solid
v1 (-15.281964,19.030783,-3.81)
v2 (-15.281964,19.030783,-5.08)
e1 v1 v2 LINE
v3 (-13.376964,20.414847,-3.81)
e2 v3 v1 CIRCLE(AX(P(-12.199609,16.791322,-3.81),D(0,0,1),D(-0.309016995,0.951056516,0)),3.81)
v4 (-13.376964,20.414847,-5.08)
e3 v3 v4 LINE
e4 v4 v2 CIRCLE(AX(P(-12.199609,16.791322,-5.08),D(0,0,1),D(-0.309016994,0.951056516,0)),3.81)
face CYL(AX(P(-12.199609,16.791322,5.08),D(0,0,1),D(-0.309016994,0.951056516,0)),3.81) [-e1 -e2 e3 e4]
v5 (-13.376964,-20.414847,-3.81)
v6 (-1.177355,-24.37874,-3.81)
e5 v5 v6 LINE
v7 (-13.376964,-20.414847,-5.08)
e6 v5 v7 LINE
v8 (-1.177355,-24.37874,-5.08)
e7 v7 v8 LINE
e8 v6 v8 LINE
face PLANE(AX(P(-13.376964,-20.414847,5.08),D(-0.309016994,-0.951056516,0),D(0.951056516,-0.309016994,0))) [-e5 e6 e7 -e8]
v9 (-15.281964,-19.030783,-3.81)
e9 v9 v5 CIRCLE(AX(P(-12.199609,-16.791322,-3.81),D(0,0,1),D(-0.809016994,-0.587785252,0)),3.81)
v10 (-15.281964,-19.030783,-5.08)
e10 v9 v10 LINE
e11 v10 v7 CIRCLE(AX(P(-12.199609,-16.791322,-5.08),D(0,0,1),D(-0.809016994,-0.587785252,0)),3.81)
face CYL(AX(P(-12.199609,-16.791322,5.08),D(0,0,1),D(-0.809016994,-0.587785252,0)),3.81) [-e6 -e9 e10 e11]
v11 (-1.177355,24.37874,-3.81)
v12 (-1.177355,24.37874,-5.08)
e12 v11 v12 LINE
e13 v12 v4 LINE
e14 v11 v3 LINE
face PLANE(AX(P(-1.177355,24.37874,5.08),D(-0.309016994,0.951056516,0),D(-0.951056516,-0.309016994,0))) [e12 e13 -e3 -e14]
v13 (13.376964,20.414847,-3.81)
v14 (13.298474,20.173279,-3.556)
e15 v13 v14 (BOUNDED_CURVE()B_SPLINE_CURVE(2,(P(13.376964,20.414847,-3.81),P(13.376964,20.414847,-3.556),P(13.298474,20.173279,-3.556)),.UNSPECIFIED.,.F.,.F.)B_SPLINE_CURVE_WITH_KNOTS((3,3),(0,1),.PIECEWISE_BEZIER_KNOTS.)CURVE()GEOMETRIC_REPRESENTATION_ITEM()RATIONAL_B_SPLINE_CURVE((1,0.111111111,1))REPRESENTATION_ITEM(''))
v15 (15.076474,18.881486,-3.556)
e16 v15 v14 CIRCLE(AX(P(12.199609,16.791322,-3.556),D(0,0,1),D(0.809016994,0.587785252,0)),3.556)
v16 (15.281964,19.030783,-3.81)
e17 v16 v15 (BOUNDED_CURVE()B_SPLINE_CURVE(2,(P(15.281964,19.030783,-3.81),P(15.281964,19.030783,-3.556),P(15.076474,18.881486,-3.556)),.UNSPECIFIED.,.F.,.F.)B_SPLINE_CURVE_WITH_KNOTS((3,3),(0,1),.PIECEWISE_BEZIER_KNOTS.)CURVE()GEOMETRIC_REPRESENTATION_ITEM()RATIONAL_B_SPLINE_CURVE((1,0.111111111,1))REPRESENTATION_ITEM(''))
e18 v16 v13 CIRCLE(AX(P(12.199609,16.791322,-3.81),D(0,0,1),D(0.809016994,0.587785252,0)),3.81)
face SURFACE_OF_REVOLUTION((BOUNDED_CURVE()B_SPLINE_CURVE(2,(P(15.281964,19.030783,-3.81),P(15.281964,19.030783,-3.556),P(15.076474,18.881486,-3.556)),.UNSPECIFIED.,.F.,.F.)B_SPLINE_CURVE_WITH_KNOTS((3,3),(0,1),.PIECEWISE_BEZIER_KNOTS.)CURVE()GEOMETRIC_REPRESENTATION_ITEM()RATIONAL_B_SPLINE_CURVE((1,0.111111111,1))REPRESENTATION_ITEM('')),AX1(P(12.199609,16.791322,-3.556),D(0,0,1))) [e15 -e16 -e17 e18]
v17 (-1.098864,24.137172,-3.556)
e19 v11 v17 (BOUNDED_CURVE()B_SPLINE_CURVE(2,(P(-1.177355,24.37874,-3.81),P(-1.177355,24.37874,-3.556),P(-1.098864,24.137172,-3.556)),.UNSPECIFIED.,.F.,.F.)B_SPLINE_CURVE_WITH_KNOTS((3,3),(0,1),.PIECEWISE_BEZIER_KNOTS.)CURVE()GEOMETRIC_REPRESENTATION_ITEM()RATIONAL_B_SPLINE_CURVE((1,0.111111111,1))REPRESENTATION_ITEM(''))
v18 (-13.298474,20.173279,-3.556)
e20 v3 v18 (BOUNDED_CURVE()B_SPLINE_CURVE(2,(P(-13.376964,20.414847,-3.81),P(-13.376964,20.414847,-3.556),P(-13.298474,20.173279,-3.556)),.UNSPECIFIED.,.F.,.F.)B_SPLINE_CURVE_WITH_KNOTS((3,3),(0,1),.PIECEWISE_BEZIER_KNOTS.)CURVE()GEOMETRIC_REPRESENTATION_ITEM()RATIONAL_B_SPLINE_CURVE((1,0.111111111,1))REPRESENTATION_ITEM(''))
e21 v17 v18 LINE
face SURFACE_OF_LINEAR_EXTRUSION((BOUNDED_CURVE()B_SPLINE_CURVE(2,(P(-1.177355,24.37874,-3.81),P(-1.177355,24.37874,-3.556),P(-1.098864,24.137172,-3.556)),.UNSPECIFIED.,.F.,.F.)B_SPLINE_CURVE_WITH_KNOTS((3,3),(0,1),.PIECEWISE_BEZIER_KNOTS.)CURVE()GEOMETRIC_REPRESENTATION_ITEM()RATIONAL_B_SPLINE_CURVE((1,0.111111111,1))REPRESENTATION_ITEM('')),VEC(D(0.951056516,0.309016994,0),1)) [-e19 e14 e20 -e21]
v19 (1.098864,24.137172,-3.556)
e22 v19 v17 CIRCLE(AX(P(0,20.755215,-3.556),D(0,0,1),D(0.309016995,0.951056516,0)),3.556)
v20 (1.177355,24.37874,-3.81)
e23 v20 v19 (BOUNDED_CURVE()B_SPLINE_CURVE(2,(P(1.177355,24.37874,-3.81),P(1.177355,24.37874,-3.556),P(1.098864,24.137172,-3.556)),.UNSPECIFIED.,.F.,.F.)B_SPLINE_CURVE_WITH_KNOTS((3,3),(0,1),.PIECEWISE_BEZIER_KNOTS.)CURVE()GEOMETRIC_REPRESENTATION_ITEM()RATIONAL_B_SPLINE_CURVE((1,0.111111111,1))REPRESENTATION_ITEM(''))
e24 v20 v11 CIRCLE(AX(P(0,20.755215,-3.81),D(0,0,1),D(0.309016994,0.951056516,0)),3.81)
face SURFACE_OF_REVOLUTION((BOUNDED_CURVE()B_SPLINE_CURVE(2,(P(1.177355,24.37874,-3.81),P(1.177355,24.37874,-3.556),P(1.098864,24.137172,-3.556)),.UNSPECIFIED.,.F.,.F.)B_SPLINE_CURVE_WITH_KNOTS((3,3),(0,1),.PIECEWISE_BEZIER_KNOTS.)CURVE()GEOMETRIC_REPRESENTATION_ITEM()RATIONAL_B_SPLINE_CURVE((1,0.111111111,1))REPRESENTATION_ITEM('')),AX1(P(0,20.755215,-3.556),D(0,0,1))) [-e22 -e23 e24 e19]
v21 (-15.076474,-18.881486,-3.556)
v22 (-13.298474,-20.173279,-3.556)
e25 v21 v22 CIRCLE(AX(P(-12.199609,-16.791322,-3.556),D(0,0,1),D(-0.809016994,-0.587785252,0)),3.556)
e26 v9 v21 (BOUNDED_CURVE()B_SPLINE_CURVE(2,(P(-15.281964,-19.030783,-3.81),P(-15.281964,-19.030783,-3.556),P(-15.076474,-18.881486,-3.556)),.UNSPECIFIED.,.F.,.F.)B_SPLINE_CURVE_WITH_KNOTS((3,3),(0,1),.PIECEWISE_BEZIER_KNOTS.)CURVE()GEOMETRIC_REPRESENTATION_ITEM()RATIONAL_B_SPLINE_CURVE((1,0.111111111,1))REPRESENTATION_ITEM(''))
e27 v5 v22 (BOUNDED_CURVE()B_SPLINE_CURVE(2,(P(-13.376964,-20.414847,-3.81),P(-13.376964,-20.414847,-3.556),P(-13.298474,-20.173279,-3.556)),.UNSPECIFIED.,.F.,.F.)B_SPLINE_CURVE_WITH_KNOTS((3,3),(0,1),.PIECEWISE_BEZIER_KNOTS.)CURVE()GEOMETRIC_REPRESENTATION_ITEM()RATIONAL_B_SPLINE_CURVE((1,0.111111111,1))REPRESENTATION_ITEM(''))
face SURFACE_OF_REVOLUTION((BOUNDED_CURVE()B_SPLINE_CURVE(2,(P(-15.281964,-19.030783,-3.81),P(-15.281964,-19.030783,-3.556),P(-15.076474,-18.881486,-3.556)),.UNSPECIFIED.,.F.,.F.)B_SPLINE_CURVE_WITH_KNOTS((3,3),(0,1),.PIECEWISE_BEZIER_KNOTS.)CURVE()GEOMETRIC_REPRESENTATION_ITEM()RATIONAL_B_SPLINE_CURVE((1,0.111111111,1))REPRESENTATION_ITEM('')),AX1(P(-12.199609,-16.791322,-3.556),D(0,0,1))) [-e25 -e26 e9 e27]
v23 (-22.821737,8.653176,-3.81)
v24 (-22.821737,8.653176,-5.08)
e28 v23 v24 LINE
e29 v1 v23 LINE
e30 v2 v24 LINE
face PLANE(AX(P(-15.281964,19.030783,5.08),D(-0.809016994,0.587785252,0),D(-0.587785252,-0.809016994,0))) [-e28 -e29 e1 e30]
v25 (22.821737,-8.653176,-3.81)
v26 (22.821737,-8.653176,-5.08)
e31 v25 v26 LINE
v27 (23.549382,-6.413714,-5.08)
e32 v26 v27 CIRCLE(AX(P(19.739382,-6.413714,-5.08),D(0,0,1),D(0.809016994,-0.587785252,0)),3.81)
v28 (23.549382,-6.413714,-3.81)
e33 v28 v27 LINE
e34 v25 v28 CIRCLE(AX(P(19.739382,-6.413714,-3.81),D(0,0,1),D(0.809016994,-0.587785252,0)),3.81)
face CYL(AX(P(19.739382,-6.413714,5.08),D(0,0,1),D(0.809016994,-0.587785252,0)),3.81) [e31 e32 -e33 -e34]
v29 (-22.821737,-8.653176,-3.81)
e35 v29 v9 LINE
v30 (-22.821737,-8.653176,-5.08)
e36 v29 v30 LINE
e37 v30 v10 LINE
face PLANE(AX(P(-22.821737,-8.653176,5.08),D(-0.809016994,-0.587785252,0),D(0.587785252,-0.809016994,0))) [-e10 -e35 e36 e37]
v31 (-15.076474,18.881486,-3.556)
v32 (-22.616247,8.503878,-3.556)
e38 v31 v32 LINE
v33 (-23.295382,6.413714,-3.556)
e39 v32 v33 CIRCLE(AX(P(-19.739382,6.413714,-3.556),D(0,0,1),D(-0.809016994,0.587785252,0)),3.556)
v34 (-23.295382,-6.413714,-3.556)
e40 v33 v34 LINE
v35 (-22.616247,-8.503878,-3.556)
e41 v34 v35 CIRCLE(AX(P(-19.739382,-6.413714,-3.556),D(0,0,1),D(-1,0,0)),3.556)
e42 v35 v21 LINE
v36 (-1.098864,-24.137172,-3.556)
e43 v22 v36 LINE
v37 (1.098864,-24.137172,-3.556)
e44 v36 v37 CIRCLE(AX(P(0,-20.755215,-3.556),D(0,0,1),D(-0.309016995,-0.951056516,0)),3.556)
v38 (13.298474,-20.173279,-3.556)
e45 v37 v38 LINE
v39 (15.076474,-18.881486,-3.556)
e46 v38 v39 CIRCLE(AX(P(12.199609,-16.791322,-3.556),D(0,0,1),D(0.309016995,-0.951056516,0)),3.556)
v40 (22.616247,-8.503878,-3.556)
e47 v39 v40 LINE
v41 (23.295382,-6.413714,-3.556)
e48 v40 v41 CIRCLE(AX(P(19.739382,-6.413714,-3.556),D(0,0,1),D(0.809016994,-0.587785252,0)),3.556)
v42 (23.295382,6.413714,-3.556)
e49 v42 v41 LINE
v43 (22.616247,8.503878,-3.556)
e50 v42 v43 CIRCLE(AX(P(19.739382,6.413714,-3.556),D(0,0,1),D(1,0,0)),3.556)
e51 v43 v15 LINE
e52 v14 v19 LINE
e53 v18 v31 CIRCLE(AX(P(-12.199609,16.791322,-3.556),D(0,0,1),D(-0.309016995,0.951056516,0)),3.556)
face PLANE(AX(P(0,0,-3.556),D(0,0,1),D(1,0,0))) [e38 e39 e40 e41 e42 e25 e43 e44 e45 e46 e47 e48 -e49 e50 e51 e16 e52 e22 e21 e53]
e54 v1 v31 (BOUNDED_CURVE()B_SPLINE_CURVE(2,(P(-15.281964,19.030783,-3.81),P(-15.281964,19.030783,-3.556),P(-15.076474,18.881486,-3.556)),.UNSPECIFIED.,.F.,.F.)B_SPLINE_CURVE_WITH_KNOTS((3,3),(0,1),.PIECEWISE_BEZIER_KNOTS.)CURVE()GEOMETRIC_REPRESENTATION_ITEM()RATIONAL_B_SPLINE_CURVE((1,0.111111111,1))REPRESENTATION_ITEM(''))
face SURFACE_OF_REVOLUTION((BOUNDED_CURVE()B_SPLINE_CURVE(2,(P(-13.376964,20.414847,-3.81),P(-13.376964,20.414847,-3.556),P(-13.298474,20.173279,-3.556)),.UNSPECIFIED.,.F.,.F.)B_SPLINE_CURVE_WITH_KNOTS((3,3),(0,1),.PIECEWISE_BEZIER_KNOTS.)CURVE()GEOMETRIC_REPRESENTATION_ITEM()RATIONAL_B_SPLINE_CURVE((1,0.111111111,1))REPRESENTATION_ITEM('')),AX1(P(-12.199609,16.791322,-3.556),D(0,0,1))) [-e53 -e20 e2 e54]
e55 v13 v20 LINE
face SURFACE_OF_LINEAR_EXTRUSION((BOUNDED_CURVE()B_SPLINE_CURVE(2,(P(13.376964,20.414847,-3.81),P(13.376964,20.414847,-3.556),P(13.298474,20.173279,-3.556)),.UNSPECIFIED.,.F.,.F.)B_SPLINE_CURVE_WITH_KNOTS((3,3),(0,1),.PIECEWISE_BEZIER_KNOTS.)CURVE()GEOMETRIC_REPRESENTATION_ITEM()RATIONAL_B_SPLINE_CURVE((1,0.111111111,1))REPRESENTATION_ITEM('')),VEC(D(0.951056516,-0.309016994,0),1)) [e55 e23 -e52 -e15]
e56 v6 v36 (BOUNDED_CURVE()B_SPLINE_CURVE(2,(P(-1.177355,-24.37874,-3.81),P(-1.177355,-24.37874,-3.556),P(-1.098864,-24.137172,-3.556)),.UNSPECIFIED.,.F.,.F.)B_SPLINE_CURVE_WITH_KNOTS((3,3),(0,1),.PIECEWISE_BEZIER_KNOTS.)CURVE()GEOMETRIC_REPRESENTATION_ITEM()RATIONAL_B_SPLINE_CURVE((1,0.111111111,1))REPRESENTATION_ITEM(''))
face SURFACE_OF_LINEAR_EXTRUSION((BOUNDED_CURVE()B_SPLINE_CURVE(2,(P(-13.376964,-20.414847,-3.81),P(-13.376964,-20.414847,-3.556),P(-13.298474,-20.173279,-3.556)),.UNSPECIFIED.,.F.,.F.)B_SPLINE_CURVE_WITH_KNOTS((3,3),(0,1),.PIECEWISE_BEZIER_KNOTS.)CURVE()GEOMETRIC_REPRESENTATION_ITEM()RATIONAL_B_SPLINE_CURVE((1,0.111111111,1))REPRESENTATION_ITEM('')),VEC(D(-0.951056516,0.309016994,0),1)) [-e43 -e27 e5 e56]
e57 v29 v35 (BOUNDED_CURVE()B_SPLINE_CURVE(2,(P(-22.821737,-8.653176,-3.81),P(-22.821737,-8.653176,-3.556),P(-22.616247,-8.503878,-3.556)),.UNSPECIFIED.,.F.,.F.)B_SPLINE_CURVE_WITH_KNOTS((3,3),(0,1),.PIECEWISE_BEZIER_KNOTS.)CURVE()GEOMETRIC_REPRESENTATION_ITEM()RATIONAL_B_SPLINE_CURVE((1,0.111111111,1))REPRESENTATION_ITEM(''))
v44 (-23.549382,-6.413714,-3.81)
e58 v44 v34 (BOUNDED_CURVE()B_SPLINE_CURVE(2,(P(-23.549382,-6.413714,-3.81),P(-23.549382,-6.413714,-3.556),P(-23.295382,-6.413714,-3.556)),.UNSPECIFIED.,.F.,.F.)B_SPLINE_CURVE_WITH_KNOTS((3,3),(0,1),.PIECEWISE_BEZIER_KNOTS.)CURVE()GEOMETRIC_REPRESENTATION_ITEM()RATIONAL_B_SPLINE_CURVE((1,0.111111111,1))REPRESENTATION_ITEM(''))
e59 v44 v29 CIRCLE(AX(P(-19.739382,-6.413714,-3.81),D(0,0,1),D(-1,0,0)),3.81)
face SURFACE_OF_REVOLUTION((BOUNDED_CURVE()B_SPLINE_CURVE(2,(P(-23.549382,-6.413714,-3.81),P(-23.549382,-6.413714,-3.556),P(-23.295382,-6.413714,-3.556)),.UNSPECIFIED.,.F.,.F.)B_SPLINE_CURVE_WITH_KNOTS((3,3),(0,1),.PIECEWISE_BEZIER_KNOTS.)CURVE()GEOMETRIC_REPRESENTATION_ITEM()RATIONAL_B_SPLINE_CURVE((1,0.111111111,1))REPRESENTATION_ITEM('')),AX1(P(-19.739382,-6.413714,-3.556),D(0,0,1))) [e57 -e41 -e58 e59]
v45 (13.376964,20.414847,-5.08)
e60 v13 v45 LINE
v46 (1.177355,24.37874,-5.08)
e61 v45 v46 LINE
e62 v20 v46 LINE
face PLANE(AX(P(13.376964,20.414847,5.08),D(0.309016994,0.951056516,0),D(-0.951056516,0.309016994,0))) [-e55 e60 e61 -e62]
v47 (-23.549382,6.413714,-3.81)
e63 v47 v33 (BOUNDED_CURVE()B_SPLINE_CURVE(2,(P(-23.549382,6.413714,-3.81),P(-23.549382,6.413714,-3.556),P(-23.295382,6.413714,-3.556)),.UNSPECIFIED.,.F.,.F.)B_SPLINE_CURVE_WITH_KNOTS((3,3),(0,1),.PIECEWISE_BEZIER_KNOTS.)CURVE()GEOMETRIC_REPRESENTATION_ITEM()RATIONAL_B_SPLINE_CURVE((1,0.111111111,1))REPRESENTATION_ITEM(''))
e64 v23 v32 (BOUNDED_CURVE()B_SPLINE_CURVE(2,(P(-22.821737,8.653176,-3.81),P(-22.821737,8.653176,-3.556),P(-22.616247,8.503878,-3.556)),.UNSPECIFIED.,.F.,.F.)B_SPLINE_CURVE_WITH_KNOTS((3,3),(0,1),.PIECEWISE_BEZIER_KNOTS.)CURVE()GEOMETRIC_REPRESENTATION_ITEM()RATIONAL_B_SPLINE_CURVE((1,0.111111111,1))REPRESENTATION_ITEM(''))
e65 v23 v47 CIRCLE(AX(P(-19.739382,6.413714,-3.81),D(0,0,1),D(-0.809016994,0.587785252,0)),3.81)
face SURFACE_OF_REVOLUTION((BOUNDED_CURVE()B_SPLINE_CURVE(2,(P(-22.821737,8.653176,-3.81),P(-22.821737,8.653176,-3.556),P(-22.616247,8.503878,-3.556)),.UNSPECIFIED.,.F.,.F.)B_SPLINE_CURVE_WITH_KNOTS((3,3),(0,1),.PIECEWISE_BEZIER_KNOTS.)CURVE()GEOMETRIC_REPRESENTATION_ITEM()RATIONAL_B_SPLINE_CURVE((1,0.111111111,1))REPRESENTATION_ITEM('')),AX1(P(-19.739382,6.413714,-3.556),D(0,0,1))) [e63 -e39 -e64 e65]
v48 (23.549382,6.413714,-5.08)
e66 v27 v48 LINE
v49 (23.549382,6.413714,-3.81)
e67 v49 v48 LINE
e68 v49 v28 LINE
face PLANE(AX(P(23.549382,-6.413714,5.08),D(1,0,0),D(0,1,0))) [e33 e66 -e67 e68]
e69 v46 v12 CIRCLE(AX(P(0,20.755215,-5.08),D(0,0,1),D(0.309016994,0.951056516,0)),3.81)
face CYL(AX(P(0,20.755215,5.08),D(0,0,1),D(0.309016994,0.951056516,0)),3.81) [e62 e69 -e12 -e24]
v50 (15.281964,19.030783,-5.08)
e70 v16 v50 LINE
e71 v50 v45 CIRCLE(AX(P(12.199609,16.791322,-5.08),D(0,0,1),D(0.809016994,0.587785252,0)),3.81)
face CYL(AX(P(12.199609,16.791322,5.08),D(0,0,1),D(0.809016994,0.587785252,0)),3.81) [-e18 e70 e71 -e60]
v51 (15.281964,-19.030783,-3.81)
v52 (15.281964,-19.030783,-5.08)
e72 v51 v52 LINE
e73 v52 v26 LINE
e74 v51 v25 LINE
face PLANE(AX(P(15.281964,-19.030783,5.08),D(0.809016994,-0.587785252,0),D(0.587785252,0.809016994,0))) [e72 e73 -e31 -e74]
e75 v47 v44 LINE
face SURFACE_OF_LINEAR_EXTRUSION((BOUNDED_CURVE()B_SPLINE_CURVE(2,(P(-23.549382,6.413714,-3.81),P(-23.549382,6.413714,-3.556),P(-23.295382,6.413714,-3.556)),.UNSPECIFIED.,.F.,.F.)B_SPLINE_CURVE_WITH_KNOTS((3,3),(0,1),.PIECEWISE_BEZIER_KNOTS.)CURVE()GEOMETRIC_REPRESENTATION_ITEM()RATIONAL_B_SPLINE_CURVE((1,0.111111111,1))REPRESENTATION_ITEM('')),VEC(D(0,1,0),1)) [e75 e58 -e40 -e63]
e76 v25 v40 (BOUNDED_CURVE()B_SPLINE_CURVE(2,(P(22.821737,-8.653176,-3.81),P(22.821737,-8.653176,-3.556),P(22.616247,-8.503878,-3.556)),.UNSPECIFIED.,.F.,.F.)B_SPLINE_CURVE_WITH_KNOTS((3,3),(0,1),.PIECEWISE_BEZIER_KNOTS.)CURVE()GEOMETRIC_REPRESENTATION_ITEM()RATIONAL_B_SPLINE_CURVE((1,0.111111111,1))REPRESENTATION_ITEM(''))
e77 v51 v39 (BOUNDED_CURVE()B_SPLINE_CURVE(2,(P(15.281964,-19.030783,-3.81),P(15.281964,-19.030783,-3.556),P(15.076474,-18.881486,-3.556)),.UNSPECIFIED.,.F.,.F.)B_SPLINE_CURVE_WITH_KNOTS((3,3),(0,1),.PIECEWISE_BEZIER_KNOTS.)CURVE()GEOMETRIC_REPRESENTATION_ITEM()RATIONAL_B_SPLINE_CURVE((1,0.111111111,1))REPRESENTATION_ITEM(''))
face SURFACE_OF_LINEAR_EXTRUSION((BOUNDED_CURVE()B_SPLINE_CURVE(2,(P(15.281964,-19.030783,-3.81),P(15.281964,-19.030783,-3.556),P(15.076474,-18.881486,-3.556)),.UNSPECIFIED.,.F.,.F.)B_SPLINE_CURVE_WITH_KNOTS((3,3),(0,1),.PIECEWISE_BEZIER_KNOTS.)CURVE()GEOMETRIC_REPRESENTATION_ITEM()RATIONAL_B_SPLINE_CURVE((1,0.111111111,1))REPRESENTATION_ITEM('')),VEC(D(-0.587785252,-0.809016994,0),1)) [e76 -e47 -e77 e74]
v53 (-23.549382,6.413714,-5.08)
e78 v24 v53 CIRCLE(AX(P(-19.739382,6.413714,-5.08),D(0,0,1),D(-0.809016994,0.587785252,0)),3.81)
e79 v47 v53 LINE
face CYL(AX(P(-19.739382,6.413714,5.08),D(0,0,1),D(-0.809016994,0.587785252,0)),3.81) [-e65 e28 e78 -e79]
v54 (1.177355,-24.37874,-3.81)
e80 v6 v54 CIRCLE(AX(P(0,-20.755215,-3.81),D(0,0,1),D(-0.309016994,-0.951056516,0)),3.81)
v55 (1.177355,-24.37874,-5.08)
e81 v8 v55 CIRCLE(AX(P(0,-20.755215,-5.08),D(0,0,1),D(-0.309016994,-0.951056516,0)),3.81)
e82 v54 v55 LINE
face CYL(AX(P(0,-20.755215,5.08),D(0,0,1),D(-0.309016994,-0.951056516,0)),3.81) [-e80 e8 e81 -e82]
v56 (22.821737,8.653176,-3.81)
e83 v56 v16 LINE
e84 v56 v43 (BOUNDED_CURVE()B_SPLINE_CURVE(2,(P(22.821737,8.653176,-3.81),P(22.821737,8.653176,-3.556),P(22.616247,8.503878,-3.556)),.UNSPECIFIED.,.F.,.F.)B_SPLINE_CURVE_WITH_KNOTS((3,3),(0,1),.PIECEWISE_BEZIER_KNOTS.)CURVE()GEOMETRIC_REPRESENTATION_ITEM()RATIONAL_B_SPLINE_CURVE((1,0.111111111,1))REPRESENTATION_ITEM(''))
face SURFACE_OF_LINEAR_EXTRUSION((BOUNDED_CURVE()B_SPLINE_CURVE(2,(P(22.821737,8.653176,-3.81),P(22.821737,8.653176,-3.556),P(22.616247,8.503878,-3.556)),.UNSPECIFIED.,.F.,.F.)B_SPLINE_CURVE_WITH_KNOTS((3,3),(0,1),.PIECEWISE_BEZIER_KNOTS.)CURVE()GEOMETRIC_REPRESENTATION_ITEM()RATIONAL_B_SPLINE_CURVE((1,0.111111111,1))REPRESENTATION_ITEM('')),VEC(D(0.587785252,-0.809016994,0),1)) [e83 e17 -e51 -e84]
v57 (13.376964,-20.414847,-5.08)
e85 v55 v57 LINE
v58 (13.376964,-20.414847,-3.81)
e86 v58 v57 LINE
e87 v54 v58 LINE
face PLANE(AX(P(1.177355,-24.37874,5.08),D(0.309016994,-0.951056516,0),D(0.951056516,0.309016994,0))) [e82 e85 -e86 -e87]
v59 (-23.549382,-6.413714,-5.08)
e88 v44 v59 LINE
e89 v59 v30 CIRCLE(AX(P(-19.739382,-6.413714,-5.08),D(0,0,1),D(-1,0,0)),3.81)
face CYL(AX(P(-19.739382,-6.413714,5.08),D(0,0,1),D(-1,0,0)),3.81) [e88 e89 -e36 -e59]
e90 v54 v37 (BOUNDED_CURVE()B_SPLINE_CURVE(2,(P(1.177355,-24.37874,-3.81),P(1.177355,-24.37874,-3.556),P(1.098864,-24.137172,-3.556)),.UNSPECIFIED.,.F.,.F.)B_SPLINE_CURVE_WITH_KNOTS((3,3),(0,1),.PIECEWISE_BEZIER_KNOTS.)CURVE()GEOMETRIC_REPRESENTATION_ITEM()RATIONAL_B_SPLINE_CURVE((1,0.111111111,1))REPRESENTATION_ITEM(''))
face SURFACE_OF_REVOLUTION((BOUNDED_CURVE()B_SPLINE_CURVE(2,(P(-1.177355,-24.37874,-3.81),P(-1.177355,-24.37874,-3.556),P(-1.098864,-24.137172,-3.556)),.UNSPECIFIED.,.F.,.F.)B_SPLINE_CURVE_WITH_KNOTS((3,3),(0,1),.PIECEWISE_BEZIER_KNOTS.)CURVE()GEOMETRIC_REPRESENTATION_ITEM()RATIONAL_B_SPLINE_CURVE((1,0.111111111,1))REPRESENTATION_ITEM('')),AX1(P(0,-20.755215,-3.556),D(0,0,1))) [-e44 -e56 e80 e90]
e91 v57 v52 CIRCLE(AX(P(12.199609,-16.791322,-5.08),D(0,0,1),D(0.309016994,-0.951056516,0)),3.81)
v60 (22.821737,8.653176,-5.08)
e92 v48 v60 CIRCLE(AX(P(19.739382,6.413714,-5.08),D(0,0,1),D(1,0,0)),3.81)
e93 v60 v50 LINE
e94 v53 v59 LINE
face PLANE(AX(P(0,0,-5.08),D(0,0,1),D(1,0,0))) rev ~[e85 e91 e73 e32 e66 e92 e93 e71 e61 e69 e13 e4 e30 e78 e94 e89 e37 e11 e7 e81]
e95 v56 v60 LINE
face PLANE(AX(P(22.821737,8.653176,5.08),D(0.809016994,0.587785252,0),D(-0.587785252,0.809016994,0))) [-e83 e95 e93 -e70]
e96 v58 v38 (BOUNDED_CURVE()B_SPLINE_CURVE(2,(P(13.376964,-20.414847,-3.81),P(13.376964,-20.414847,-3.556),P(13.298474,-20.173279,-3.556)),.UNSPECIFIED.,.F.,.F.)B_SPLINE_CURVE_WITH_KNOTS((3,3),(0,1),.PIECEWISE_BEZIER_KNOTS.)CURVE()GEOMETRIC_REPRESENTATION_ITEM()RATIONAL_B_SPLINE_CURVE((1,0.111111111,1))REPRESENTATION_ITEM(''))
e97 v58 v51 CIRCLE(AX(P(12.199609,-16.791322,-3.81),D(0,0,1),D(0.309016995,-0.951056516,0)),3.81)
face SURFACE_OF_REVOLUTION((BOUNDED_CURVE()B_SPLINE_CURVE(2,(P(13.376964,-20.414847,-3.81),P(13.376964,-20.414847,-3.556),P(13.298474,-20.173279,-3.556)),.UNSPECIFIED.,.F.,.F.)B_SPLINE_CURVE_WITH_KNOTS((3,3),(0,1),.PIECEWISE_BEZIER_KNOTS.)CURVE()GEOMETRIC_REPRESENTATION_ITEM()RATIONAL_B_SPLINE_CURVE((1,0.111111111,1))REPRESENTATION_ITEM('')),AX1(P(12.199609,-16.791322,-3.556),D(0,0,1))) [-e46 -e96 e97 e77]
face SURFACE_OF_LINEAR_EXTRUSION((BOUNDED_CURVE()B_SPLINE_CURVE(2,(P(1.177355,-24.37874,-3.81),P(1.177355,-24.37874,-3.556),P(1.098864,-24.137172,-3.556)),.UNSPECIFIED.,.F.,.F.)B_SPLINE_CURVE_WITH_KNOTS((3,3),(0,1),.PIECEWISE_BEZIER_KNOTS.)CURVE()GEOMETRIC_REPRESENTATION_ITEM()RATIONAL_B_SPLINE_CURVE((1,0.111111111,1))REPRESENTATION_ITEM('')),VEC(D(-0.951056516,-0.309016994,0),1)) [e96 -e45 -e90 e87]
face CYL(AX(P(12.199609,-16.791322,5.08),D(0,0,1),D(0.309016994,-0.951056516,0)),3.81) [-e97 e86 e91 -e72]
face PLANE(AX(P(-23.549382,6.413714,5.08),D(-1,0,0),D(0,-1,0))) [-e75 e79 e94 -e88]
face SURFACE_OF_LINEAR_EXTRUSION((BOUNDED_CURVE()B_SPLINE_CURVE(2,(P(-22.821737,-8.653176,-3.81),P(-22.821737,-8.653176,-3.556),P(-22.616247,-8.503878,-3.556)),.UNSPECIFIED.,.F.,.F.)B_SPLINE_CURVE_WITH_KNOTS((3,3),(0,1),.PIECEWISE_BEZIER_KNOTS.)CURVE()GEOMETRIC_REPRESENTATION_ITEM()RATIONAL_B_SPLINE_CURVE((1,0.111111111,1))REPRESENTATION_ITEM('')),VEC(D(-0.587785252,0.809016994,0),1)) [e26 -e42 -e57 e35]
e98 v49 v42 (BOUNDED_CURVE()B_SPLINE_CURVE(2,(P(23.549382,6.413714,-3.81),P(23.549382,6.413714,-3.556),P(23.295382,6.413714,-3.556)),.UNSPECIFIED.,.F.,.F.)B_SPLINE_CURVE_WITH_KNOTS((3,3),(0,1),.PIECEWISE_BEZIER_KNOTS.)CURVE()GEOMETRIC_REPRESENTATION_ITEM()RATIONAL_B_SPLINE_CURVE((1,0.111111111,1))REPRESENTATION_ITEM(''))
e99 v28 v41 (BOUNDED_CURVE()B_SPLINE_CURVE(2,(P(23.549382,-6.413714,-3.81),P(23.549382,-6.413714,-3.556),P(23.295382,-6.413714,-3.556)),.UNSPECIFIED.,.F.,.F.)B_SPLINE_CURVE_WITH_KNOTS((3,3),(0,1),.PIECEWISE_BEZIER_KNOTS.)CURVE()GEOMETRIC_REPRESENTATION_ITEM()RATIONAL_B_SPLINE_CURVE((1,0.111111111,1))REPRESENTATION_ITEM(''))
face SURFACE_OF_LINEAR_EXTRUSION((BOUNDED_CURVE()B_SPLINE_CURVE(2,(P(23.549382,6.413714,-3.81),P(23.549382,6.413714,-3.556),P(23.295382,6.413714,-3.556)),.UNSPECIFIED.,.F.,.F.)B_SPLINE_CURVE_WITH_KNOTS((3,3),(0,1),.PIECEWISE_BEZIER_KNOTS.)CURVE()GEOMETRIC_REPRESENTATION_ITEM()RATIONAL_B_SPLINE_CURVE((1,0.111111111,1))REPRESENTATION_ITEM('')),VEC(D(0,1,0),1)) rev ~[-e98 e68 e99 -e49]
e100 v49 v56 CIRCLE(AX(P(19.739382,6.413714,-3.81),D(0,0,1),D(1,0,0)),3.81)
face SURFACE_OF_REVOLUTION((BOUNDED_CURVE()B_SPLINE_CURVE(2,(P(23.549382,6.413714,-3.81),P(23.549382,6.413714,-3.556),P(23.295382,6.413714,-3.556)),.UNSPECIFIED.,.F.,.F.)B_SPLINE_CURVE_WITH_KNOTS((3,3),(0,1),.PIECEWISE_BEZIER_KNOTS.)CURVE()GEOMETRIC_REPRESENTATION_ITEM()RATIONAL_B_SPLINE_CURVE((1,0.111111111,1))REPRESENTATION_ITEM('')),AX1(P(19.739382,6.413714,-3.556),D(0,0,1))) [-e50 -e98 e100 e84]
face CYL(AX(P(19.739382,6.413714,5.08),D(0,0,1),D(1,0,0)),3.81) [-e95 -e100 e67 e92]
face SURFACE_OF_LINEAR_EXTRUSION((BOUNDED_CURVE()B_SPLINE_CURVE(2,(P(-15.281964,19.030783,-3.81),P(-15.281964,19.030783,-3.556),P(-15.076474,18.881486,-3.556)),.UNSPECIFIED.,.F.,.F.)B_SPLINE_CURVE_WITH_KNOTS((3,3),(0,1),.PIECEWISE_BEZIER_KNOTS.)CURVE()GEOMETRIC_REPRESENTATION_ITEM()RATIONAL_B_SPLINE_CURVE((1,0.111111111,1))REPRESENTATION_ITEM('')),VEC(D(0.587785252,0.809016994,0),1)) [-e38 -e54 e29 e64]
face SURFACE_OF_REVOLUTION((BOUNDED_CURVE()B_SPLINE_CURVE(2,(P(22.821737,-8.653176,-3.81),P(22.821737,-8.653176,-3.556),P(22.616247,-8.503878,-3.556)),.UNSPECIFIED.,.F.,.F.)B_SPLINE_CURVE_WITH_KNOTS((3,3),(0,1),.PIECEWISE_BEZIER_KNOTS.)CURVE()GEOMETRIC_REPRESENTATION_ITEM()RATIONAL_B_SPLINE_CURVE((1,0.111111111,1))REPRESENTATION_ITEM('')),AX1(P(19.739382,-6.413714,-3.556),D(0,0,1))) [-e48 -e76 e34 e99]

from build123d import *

# Parameters (mm, degrees)
F1_DEPTH       = 5.08
F2_R           = 6.35
F3_R           = 1.27
F5_DEPTH       = 1.27
F7_D           = 3.81
F7_DEPTH       = 12.7
F7_CBORE_D     = 5.08
F7_CBORE_DEPTH = 1.27
F7_TIP         = 1.1446394792
F8_DEPTH       = 25.4
F9_DEPTH       = 6.35
F10_DEPTH      = 1.016
F11_T1_DEPTH   = 12.8274282372
F11_T3_DEPTH   = 12.8274282372
F11_T5_DEPTH   = 12.8274282372
F11_T7_DEPTH   = 12.8274282372
F11_T9_DEPTH   = 12.8274282372
F11_T11_DEPTH  = 12.8274282372
F11_T13_DEPTH  = 12.8274282372
F11_T15_DEPTH  = 12.8274282372
F11_T17_DEPTH  = 12.8274282372
F11_T20_ANGLE  = 36
F11_T22_ANGLE  = 36
F11_T24_ANGLE  = 36
F11_T26_ANGLE  = 36
F11_T28_ANGLE  = 36
F11_T30_ANGLE  = 36
F11_T32_ANGLE  = 36
F11_T34_ANGLE  = 36
F11_T36_ANGLE  = 36
F11_T38_ANGLE  = 36


# Not quite as in the source:
# - a fillet or chamfer that OpenCascade refuses, or shapes differently, is made with other operations: its cross-section is extruded or revolved along the edge and cut away or added


with BuildPart() as f1:
    # F0 (on Top) → F1 (new body, symmetric)
    with BuildSketch(Plane.XY):
        Polygon((26.089382355, -8.4769541897), (26.089382355, 8.4769541897), (16.1241250409, 22.1929541897), (0, 27.432), (-16.1241250409, 22.1929541897), (-26.089382355, 8.4769541897), (-26.089382355, -8.4769541897), (-16.1241250409, -22.1929541897), (0, -27.432), (16.1241250409, -22.1929541897), align=None)
    extrude(amount=F1_DEPTH, both=True)

    # F2
    f2_edges = [f1.edges().sort_by_distance(p)[0] for p in [
        (-16.124125, -22.192954, 0),
        (-26.089382, -8.476954, 0),
        (-26.089382, 8.476954, 0),
        (-16.124125, 22.192954, 0),
        (0, 27.432, 0),
        (16.124125, 22.192954, 0),
        (26.089382, 8.476954, 0),
        (16.124125, -22.192954, 0),
        (0, -27.432, 0),
        (26.089382, -8.476954, 0),
    ]]
    fillet(f2_edges, radius=F2_R)

    # F3
    f3_edges = [f1.edges().sort_by_distance(p)[0] for p in [
        (21.106754, -15.334954, -5.08),
        (15.932046, -21.928579, -5.08),
        (25.778591, -8.375972, -5.08),
        (8.062063, -24.812477, -5.08),
        (26.089382, 0, -5.08),
        (0, -27.105215, -5.08),
        (25.778591, 8.375972, -5.08),
        (-8.062063, -24.812477, -5.08),
        (21.106754, 15.334954, -5.08),
        (-15.932046, -21.928579, -5.08),
        (15.932046, 21.928579, -5.08),
        (-21.106754, -15.334954, -5.08),
        (8.062063, 24.812477, -5.08),
        (-25.778591, -8.375972, -5.08),
        (0, 27.105215, -5.08),
        (-26.089382, 0, -5.08),
        (-8.062063, 24.812477, -5.08),
        (-25.778591, 8.375972, -5.08),
        (-15.932046, 21.928579, -5.08),
        (-21.106754, 15.334954, -5.08),
    ]]
    fillet(f3_edges, radius=F3_R)

    # F4 (on face) → F5 (cut)
    with BuildSketch(Plane.XY.offset(5.08)):
        with BuildLine():
            ThreePointArc((-23.549382355, -6.4137141186), (-23.3629076821, -7.5910688672), (-22.8217371036, -8.6531759298))
            Line((-22.8217371036, -8.6531759298), (-15.2819639609, -19.0307833679))
            ThreePointArc((-15.2819639609, -19.0307833679), (-14.4390710236, -19.8736763052), (-13.3769639609, -20.4148468837))
            Line((-13.3769639609, -20.4148468837), (-1.1773547486, -24.3787402032))
            ThreePointArc((-1.1773547486, -24.3787402032), (0, -24.5652148761), (1.1773547486, -24.3787402032))
            Line((1.1773547486, -24.3787402032), (13.3769639609, -20.4148468837))
            ThreePointArc((13.3769639609, -20.4148468837), (14.4390710236, -19.8736763052), (15.2819639609, -19.0307833679))
            Line((15.2819639609, -19.0307833679), (22.8217371036, -8.6531759298))
            ThreePointArc((22.8217371036, -8.6531759298), (23.3629076821, -7.5910688672), (23.549382355, -6.4137141186))
            Line((23.549382355, -6.4137141186), (23.549382355, 6.4137141186))
            ThreePointArc((23.549382355, 6.4137141186), (23.3629076821, 7.5910688672), (22.8217371036, 8.6531759298))
            Line((22.8217371036, 8.6531759298), (15.2819639609, 19.0307833679))
            ThreePointArc((15.2819639609, 19.0307833679), (14.4390710236, 19.8736763052), (13.3769639609, 20.4148468837))
            Line((13.3769639609, 20.4148468837), (1.1773547486, 24.3787402032))
            ThreePointArc((1.1773547486, 24.3787402032), (0, 24.5652148761), (-1.1773547486, 24.3787402032))
            Line((-1.1773547486, 24.3787402032), (-13.3769639609, 20.4148468837))
            ThreePointArc((-13.3769639609, 20.4148468837), (-14.4390710236, 19.8736763052), (-15.2819639609, 19.0307833679))
            Line((-15.2819639609, 19.0307833679), (-22.8217371036, 8.6531759298))
            ThreePointArc((-22.8217371036, 8.6531759298), (-23.3629076821, 7.5910688672), (-23.549382355, 6.4137141186))
            Line((-23.549382355, 6.4137141186), (-23.549382355, -6.4137141186))
        make_face()
    extrude(amount=-F5_DEPTH, mode=Mode.SUBTRACT)

    # F7
    with Locations(Plane.YZ.offset(26.089382355)):
        with Locations((0, 0)):
            CounterBoreHole(F7_D / 2, F7_CBORE_D / 2, F7_CBORE_DEPTH, depth=F7_DEPTH)
            with Locations((0, 0, -(F7_DEPTH + F7_TIP / 2))):  # 118° drill point
                Cone(0, F7_D / 2, F7_TIP, mode=Mode.SUBTRACT)

    # F8 (cut): a face of the model
    f8_faces = [f1.faces().sort_by_distance(p)[0] for p in [
        (20.4980312163, -14.892691419, 5.08),
    ]]
    extrude(f8_faces, amount=-F8_DEPTH, mode=Mode.SUBTRACT)

    # F9 (cut): a face of the model
    f9_faces = [f1.faces().sort_by_distance(p)[0] for p in [
        (0, 0, 3.81),
    ]]
    extrude(f9_faces, amount=-F9_DEPTH, mode=Mode.SUBTRACT)

    # F10 (cut): a face of the model
    f10_faces = [f1.faces().sort_by_distance(p)[0] for p in [
        (0, 0, -2.54),
    ]]
    extrude(f10_faces, amount=-F10_DEPTH, mode=Mode.SUBTRACT)

    # F11: fillet of radius 0.254 on 20 edges, made by hand

    # F11_s2 → F11_t1 (cut)
    with BuildSketch(Plane(origin=(3.7698865713, 5.188803719, 0), x_dir=(0, 0, 1), z_dir=(-0.5877852523, -0.8090169944, 0))):
        with BuildLine():
            add(Edge.make_bspline(
                [(-3.81, 23.549382355), (-3.556, 23.549382355), (-3.556, 23.295382355)],
                knots=[0, 0, 0, 1, 1, 1], degree=2, weights=[1, 0.1111111111, 1]))
            Line((-3.556, 23.295382355), (-3.556, 23.549382355))
            Line((-3.556, 23.549382355), (-3.81, 23.549382355))
        make_face()
    extrude(amount=F11_T1_DEPTH, mode=Mode.SUBTRACT)

    # F11_s4 → F11_t3 (cut)
    with BuildSketch(Plane.XZ.offset(-6.4137141186)):
        with BuildLine():
            add(Edge.make_bspline(
                [(-23.549382355, -3.81), (-23.549382355, -3.556), (-23.295382355, -3.556)],
                knots=[0, 0, 0, 1, 1, 1], degree=2, weights=[1, 0.1111111111, 1]))
            Line((-23.295382355, -3.556), (-23.549382355, -3.556))
            Line((-23.549382355, -3.556), (-23.549382355, -3.81))
        make_face()
        with BuildLine():
            add(Edge.make_bspline(
                [(23.549382355, -3.81), (23.549382355, -3.556), (23.295382355, -3.556)],
                knots=[0, 0, 0, 1, 1, 1], degree=2, weights=[1, 0.1111111111, 1]))
            Line((23.295382355, -3.556), (23.549382355, -3.556))
            Line((23.549382355, -3.556), (23.549382355, -3.81))
        make_face()
    extrude(amount=F11_T3_DEPTH, mode=Mode.SUBTRACT)

    # F11_s6 → F11_t5 (cut)
    with BuildSketch(Plane(origin=(-3.7698865713, 5.188803719, 0), x_dir=(0, 0, 1), z_dir=(0.5877852523, -0.8090169944, 0))):
        with BuildLine():
            add(Edge.make_bspline(
                [(-3.81, 23.549382355), (-3.556, 23.549382355), (-3.556, 23.295382355)],
                knots=[0, 0, 0, 1, 1, 1], degree=2, weights=[1, 0.1111111111, 1]))
            Line((-3.556, 23.295382355), (-3.556, 23.549382355))
            Line((-3.556, 23.549382355), (-3.81, 23.549382355))
        make_face()
    extrude(amount=F11_T5_DEPTH, mode=Mode.SUBTRACT)

    # F11_s8 → F11_t7 (cut)
    with BuildSketch(Plane(origin=(-6.0998046062, 1.9819466597, 0), x_dir=(0, 0, 1), z_dir=(0.9510565163, -0.3090169944, 0))):
        with BuildLine():
            add(Edge.make_bspline(
                [(-3.81, 23.549382355), (-3.556, 23.549382355), (-3.556, 23.295382355)],
                knots=[0, 0, 0, 1, 1, 1], degree=2, weights=[1, 0.1111111111, 1]))
            Line((-3.556, 23.295382355), (-3.556, 23.549382355))
            Line((-3.556, 23.549382355), (-3.81, 23.549382355))
        make_face()
    extrude(amount=F11_T7_DEPTH, mode=Mode.SUBTRACT)

    # F11_s10 → F11_t9 (cut)
    with BuildSketch(Plane(origin=(-6.0998046062, -1.9819466597, 0), x_dir=(0, 0, 1), z_dir=(0.9510565163, 0.3090169944, 0))):
        with BuildLine():
            add(Edge.make_bspline(
                [(-3.81, 23.549382355), (-3.556, 23.549382355), (-3.556, 23.295382355)],
                knots=[0, 0, 0, 1, 1, 1], degree=2, weights=[1, 0.1111111111, 1]))
            Line((-3.556, 23.295382355), (-3.556, 23.549382355))
            Line((-3.556, 23.549382355), (-3.81, 23.549382355))
        make_face()
    extrude(amount=F11_T9_DEPTH, mode=Mode.SUBTRACT)

    # F11_s12 → F11_t11 (cut)
    with BuildSketch(Plane(origin=(-3.7698865713, -5.188803719, 0), x_dir=(0, 0, 1), z_dir=(0.5877852523, 0.8090169944, 0))):
        with BuildLine():
            add(Edge.make_bspline(
                [(-3.81, 23.549382355), (-3.556, 23.549382355), (-3.556, 23.295382355)],
                knots=[0, 0, 0, 1, 1, 1], degree=2, weights=[1, 0.1111111111, 1]))
            Line((-3.556, 23.295382355), (-3.556, 23.549382355))
            Line((-3.556, 23.549382355), (-3.81, 23.549382355))
        make_face()
    extrude(amount=F11_T11_DEPTH, mode=Mode.SUBTRACT)

    # F11_s14 → F11_t13 (cut)
    with BuildSketch(Plane(origin=(3.7698865713, -5.188803719, 0), x_dir=(0, 0, 1), z_dir=(-0.5877852523, 0.8090169944, 0))):
        with BuildLine():
            add(Edge.make_bspline(
                [(-3.81, 23.549382355), (-3.556, 23.549382355), (-3.556, 23.295382355)],
                knots=[0, 0, 0, 1, 1, 1], degree=2, weights=[1, 0.1111111111, 1]))
            Line((-3.556, 23.295382355), (-3.556, 23.549382355))
            Line((-3.556, 23.549382355), (-3.81, 23.549382355))
        make_face()
    extrude(amount=F11_T13_DEPTH, mode=Mode.SUBTRACT)

    # F11_s16 → F11_t15 (cut)
    with BuildSketch(Plane(origin=(6.0998046062, -1.9819466597, 0), x_dir=(0, 0, 1), z_dir=(-0.9510565163, 0.3090169944, 0))):
        with BuildLine():
            add(Edge.make_bspline(
                [(-3.81, 23.549382355), (-3.556, 23.549382355), (-3.556, 23.295382355)],
                knots=[0, 0, 0, 1, 1, 1], degree=2, weights=[1, 0.1111111111, 1]))
            Line((-3.556, 23.295382355), (-3.556, 23.549382355))
            Line((-3.556, 23.549382355), (-3.81, 23.549382355))
        make_face()
    extrude(amount=F11_T15_DEPTH, mode=Mode.SUBTRACT)

    # F11_s18 → F11_t17 (cut)
    with BuildSketch(Plane(origin=(6.0998046062, 1.9819466597, 0), x_dir=(0, 0, 1), z_dir=(-0.9510565163, -0.3090169944, 0))):
        with BuildLine():
            add(Edge.make_bspline(
                [(-3.81, 23.549382355), (-3.556, 23.549382355), (-3.556, 23.295382355)],
                knots=[0, 0, 0, 1, 1, 1], degree=2, weights=[1, 0.1111111111, 1]))
            Line((-3.556, 23.295382355), (-3.556, 23.549382355))
            Line((-3.556, 23.549382355), (-3.81, 23.549382355))
        make_face()
    extrude(amount=F11_T17_DEPTH, mode=Mode.SUBTRACT)

    # F11_s19 → F11_t20 (revolve, cut)
    with BuildSketch(Plane(origin=(-6.0998046062, -1.9819466597, 0), x_dir=(0, 0, 1), z_dir=(0.9510565163, 0.3090169944, 0))):
        with BuildLine():
            add(Edge.make_bspline(
                [(-3.81, -23.549382355), (-3.556, -23.549382355), (-3.556, -23.295382355)],
                knots=[0, 0, 0, 1, 1, 1], degree=2, weights=[1, 0.1111111111, 1]))
            Line((-3.556, -23.295382355), (-3.556, -23.549382355))
            Line((-3.556, -23.549382355), (-3.81, -23.549382355))
        make_face()
    revolve(axis=Axis((-12.1996092123, 16.7913215567, -3.556), (0, 0, 1)), revolution_arc=F11_T20_ANGLE, mode=Mode.SUBTRACT)

    # F11_s21 → F11_t22 (revolve, cut)
    with BuildSketch(Plane(origin=(-3.7698865713, -5.188803719, 0), x_dir=(0, 0, 1), z_dir=(0.5877852523, 0.8090169944, 0))):
        with BuildLine():
            add(Edge.make_bspline(
                [(-3.81, -23.549382355), (-3.556, -23.549382355), (-3.556, -23.295382355)],
                knots=[0, 0, 0, 1, 1, 1], degree=2, weights=[1, 0.1111111111, 1]))
            Line((-3.556, -23.295382355), (-3.556, -23.549382355))
            Line((-3.556, -23.549382355), (-3.81, -23.549382355))
        make_face()
    revolve(axis=Axis((-19.739382355, 6.4137141186, -3.556), (0, 0, 1)), revolution_arc=F11_T22_ANGLE, mode=Mode.SUBTRACT)

    # F11_s23 → F11_t24 (revolve, cut)
    with BuildSketch(Plane.XZ.offset(6.4137141186)):
        with BuildLine():
            add(Edge.make_bspline(
                [(-23.549382355, -3.81), (-23.549382355, -3.556), (-23.295382355, -3.556)],
                knots=[0, 0, 0, 1, 1, 1], degree=2, weights=[1, 0.1111111111, 1]))
            Line((-23.295382355, -3.556), (-23.549382355, -3.556))
            Line((-23.549382355, -3.556), (-23.549382355, -3.81))
        make_face()
    revolve(axis=Axis((-19.739382355, -6.4137141186, -3.556), (0, 0, 1)), revolution_arc=F11_T24_ANGLE, mode=Mode.SUBTRACT)

    # F11_s25 → F11_t26 (revolve, cut)
    with BuildSketch(Plane(origin=(3.7698865713, -5.188803719, 0), x_dir=(0, 0, 1), z_dir=(-0.5877852523, 0.8090169944, 0))):
        with BuildLine():
            add(Edge.make_bspline(
                [(-3.81, -23.549382355), (-3.556, -23.549382355), (-3.556, -23.295382355)],
                knots=[0, 0, 0, 1, 1, 1], degree=2, weights=[1, 0.1111111111, 1]))
            Line((-3.556, -23.295382355), (-3.556, -23.549382355))
            Line((-3.556, -23.549382355), (-3.81, -23.549382355))
        make_face()
    revolve(axis=Axis((-12.1996092123, -16.7913215567, -3.556), (0, 0, 1)), revolution_arc=F11_T26_ANGLE, mode=Mode.SUBTRACT)

    # F11_s27 → F11_t28 (revolve, cut)
    with BuildSketch(Plane(origin=(6.0998046062, -1.9819466597, 0), x_dir=(0, 0, 1), z_dir=(-0.9510565163, 0.3090169944, 0))):
        with BuildLine():
            add(Edge.make_bspline(
                [(-3.81, -23.549382355), (-3.556, -23.549382355), (-3.556, -23.295382355)],
                knots=[0, 0, 0, 1, 1, 1], degree=2, weights=[1, 0.1111111111, 1]))
            Line((-3.556, -23.295382355), (-3.556, -23.549382355))
            Line((-3.556, -23.549382355), (-3.81, -23.549382355))
        make_face()
    revolve(axis=Axis((0, -20.7552148761, -3.556), (0, 0, 1)), revolution_arc=F11_T28_ANGLE, mode=Mode.SUBTRACT)

    # F11_s29 → F11_t30 (revolve, cut)
    with BuildSketch(Plane(origin=(6.0998046062, 1.9819466597, 0), x_dir=(0, 0, 1), z_dir=(-0.9510565163, -0.3090169944, 0))):
        with BuildLine():
            add(Edge.make_bspline(
                [(-3.81, -23.549382355), (-3.556, -23.549382355), (-3.556, -23.295382355)],
                knots=[0, 0, 0, 1, 1, 1], degree=2, weights=[1, 0.1111111111, 1]))
            Line((-3.556, -23.295382355), (-3.556, -23.549382355))
            Line((-3.556, -23.549382355), (-3.81, -23.549382355))
        make_face()
    revolve(axis=Axis((12.1996092123, -16.7913215567, -3.556), (0, 0, 1)), revolution_arc=F11_T30_ANGLE, mode=Mode.SUBTRACT)

    # F11_s31 → F11_t32 (revolve, cut)
    with BuildSketch(Plane(origin=(3.7698865713, 5.188803719, 0), x_dir=(0, 0, 1), z_dir=(-0.5877852523, -0.8090169944, 0))):
        with BuildLine():
            add(Edge.make_bspline(
                [(-3.81, -23.549382355), (-3.556, -23.549382355), (-3.556, -23.295382355)],
                knots=[0, 0, 0, 1, 1, 1], degree=2, weights=[1, 0.1111111111, 1]))
            Line((-3.556, -23.295382355), (-3.556, -23.549382355))
            Line((-3.556, -23.549382355), (-3.81, -23.549382355))
        make_face()
    revolve(axis=Axis((19.739382355, -6.4137141186, -3.556), (0, 0, 1)), revolution_arc=F11_T32_ANGLE, mode=Mode.SUBTRACT)

    # F11_s33 → F11_t34 (revolve, cut)
    with BuildSketch(Plane.XZ.offset(-6.4137141186)):
        with BuildLine():
            add(Edge.make_bspline(
                [(23.549382355, -3.81), (23.549382355, -3.556), (23.295382355, -3.556)],
                knots=[0, 0, 0, 1, 1, 1], degree=2, weights=[1, 0.1111111111, 1]))
            Line((23.295382355, -3.556), (23.549382355, -3.556))
            Line((23.549382355, -3.556), (23.549382355, -3.81))
        make_face()
    revolve(axis=Axis((19.739382355, 6.4137141186, -3.556), (0, 0, 1)), revolution_arc=F11_T34_ANGLE, mode=Mode.SUBTRACT)

    # F11_s35 → F11_t36 (revolve, cut)
    with BuildSketch(Plane(origin=(-3.7698865713, 5.188803719, 0), x_dir=(0, 0, 1), z_dir=(0.5877852523, -0.8090169944, 0))):
        with BuildLine():
            add(Edge.make_bspline(
                [(-3.81, -23.549382355), (-3.556, -23.549382355), (-3.556, -23.295382355)],
                knots=[0, 0, 0, 1, 1, 1], degree=2, weights=[1, 0.1111111111, 1]))
            Line((-3.556, -23.295382355), (-3.556, -23.549382355))
            Line((-3.556, -23.549382355), (-3.81, -23.549382355))
        make_face()
    revolve(axis=Axis((12.1996092123, 16.7913215567, -3.556), (0, 0, 1)), revolution_arc=F11_T36_ANGLE, mode=Mode.SUBTRACT)

    # F11_s37 → F11_t38 (revolve, cut)
    with BuildSketch(Plane(origin=(-6.0998046062, 1.9819466597, 0), x_dir=(0, 0, 1), z_dir=(0.9510565163, -0.3090169944, 0))):
        with BuildLine():
            add(Edge.make_bspline(
                [(-3.81, -23.549382355), (-3.556, -23.549382355), (-3.556, -23.295382355)],
                knots=[0, 0, 0, 1, 1, 1], degree=2, weights=[1, 0.1111111111, 1]))
            Line((-3.556, -23.295382355), (-3.556, -23.549382355))
            Line((-3.556, -23.549382355), (-3.81, -23.549382355))
        make_face()
    revolve(axis=Axis((0, 20.7552148761, -3.556), (0, 0, 1)), revolution_arc=F11_T38_ANGLE, mode=Mode.SUBTRACT)


solid = f1.part
